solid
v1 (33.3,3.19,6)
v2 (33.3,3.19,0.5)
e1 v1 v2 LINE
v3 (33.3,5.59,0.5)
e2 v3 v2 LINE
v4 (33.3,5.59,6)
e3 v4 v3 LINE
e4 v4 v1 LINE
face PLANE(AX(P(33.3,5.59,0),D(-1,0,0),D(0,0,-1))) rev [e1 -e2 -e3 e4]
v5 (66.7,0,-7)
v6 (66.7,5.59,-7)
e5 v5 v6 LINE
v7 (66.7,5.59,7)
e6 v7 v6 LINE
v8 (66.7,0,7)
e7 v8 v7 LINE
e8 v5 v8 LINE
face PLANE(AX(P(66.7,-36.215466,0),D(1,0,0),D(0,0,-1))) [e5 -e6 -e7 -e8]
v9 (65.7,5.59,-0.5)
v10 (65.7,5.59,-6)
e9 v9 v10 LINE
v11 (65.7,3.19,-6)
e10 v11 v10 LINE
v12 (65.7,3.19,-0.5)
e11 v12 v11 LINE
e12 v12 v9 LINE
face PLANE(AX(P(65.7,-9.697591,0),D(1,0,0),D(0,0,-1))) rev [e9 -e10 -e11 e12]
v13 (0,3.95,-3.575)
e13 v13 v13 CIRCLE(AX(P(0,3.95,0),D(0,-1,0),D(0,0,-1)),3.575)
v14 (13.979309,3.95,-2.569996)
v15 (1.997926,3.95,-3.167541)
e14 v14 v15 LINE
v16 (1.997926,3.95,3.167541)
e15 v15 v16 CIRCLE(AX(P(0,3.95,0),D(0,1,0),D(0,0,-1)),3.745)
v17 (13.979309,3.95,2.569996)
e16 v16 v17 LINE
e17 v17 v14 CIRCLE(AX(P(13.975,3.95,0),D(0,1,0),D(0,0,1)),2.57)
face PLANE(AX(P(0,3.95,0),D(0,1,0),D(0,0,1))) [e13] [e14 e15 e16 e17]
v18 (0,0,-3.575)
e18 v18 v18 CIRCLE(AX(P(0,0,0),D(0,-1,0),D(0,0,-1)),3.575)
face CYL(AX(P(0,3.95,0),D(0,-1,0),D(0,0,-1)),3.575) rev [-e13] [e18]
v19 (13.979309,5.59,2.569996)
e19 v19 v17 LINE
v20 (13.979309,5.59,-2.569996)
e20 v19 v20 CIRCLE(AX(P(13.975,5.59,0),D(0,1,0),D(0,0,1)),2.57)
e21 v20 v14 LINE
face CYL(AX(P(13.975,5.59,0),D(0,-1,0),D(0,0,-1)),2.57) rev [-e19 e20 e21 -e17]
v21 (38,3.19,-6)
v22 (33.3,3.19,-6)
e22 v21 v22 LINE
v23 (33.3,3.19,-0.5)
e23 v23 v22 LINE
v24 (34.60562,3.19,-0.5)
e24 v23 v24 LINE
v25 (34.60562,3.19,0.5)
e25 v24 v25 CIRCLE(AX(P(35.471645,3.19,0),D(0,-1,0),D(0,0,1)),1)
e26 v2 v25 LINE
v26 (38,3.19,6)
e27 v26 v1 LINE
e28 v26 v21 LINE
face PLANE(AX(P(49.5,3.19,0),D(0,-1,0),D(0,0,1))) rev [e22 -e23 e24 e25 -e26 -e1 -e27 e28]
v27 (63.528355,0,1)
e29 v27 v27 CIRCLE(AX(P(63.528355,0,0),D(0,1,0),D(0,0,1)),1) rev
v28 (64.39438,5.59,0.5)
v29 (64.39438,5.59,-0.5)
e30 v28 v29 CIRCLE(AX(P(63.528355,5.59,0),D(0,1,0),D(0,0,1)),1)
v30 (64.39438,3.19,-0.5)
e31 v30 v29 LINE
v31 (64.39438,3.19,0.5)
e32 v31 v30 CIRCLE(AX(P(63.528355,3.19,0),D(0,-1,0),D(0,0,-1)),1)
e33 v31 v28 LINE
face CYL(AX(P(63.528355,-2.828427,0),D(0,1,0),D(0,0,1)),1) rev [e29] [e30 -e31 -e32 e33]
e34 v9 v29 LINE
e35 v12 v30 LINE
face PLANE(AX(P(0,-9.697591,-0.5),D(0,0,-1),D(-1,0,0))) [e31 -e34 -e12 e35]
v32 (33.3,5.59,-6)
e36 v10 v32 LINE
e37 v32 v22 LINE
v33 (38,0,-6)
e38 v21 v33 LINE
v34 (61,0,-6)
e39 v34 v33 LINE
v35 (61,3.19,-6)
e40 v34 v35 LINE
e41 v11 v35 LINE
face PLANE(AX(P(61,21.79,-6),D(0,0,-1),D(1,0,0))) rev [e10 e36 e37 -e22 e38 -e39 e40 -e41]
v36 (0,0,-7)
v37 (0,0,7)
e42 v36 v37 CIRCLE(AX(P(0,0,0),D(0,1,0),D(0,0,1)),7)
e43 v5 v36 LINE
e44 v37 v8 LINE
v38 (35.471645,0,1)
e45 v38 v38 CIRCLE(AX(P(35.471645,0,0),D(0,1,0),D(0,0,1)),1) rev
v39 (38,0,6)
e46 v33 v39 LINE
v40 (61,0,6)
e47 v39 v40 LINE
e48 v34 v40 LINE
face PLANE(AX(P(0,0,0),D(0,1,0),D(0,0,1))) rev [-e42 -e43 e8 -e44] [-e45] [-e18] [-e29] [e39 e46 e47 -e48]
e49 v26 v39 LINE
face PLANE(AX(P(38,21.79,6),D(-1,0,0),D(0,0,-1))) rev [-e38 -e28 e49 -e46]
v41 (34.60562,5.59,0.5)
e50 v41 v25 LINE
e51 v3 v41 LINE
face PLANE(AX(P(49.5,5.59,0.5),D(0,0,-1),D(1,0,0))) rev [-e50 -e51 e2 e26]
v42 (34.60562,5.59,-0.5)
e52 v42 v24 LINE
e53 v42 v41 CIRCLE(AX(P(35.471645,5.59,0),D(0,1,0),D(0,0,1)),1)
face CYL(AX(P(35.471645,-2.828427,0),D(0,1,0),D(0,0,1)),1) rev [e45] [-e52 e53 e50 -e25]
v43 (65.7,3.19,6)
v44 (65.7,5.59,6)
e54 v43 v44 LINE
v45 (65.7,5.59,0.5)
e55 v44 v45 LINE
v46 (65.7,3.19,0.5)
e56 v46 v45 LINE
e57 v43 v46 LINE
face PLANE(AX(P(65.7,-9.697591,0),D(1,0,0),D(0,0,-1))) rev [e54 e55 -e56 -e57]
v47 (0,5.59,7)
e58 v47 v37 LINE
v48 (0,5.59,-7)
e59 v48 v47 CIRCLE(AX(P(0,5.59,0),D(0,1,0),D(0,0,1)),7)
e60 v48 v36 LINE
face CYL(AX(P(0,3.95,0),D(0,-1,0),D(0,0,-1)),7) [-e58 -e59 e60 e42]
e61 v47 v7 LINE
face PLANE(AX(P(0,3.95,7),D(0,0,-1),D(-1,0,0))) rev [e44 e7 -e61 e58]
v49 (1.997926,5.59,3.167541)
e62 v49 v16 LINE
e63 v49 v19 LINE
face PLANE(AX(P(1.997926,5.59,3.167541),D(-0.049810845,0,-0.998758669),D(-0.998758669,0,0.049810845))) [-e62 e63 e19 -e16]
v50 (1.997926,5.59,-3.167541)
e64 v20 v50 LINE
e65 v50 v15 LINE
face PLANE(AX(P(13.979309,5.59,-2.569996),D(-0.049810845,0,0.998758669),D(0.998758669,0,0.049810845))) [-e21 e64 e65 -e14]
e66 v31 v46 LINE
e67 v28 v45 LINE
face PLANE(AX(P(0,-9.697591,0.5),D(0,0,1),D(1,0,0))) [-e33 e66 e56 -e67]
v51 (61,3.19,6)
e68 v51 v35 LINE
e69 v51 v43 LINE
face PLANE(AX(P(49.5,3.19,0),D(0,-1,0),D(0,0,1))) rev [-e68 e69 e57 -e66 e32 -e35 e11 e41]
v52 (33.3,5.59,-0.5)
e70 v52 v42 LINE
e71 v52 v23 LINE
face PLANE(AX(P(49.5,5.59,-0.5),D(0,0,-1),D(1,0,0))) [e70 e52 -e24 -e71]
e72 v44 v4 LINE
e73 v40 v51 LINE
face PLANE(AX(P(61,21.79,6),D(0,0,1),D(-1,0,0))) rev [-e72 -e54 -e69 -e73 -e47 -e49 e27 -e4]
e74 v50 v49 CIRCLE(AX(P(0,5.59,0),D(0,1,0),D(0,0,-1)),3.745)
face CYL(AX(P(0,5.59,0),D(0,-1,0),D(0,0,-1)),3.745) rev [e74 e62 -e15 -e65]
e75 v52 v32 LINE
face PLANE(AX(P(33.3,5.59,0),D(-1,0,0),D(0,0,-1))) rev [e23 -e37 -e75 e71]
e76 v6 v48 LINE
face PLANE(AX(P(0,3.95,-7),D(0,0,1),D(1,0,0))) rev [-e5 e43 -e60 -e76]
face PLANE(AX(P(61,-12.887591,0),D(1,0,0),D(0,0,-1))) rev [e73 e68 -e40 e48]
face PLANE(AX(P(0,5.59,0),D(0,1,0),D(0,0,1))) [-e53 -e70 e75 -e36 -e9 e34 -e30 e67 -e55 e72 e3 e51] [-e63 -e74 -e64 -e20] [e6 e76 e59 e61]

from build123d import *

# Parameters (mm, degrees)
BOSS_EXTRUDE1_DEPTH = 3.95
SKETCH2_R           = 3.575
CUT_EXTRUDE1_DEPTH  = 3.95
BOSS_EXTRUDE2_DEPTH = 1.64
SKETCH4_R           = 3.25
CUT_EXTRUDE2_DEPTH  = 63.643819328
CAVITY1_OUTLINE_R   = 3.25
CAVITY1_DEPTH       = 5.59
CAVITY1_START       = 3.19
CAVITY1_2_DEPTH     = 2.4
CUT_EXTRUDE4_DEPTH  = 63.643819328
BOSS_EXTRUDE3_START = -5.59
BOSS_EXTRUDE3_DEPTH = 5.59
BOSS_EXTRUDE4_DEPTH = 5.59
BOSS_EXTRUDE5_DEPTH = 5.59
CUT_EXTRUDE5_DEPTH  = 2.4
SKETCH7_R           = 1
CUT_EXTRUDE6_DEPTH  = 5.59


# Read off the part's stored shape, not the designer's step: Cavity1
with BuildPart() as part:
    # Sketch1 → Boss-Extrude1 (new body)
    with BuildSketch(Plane(origin=(0, 0, 0), x_dir=(1, 0, 0), z_dir=(0, 1, 0))):
        with BuildLine():
            Line((0, 7), (55, 7))
            ThreePointArc((55, 7), (62, 0), (55, -7))
            Line((55, -7), (0, -7))
            ThreePointArc((0, -7), (-7, 0), (0, 7))
        make_face()
    extrude(amount=BOSS_EXTRUDE1_DEPTH)

    # Sketch2 → Cut-Extrude1 (cut)
    with BuildSketch(Plane.XZ):
        with Locations(Location((0, 0, 0), (0, 0, 270))):
            Circle(SKETCH2_R)
    extrude(amount=-CUT_EXTRUDE1_DEPTH, mode=Mode.SUBTRACT)

    # Sketch3 → Boss-Extrude2 (add)
    with BuildSketch(Plane(origin=(0, 3.95, 0), x_dir=(1, 0, 0), z_dir=(0, 1, 0))):
        with BuildLine():
            Line((0, -7), (55, -7))
            ThreePointArc((55, -7), (62, 0), (55, 7))
            Line((55, 7), (0, 7))
            ThreePointArc((0, 7), (-7, 0), (0, -7))
        make_face()
        with BuildLine():
            Line((13.979308982, 2.569996388), (1.997926282, 3.167540934))
            ThreePointArc((1.997926282, 3.167540934), (-3.745, 0), (1.997926282, -3.167540934))
            Line((1.997926282, -3.167540934), (13.979308982, -2.569996388))
            ThreePointArc((13.979308982, -2.569996388), (16.545, 0), (13.979308982, 2.569996388))
        make_face(mode=Mode.SUBTRACT)
    extrude(amount=BOSS_EXTRUDE2_DEPTH)

    # Sketch4 → Cut-Extrude2 (cut, through all)
    with BuildSketch(Plane(origin=(0, 5.59, 0), x_dir=(1, 0, 0), z_dir=(0, 1, 0))):
        with Locations(Location((55, 0, 0), (0, 0, 270))):
            Circle(SKETCH4_R)
    extrude(amount=-CUT_EXTRUDE2_DEPTH, mode=Mode.SUBTRACT)

    # Cavity1 outline → Cavity1 (cut)
    with BuildSketch(Plane(origin=(0, 0, 0), x_dir=(1, 0, 0), z_dir=(0, 1, 0))):
        with BuildLine():
            Line((58.605551275, 6), (38, 6))
            Line((38, 6), (38, -6))
            Line((38, -6), (58.605551275, -6))
            ThreePointArc((58.605551275, -6), (59.949747468, -4.949747468), (61, -3.605551275))
            Line((61, -3.605551275), (61, 3.605551275))
            ThreePointArc((61, 3.605551275), (59.949747468, 4.949747468), (58.605551275, 6))
        make_face()
        with Locations((55, 0)):
            Circle(CAVITY1_OUTLINE_R, mode=Mode.SUBTRACT)
    extrude(amount=CAVITY1_DEPTH, mode=Mode.SUBTRACT)

    # Cavity1 2 outline → Cavity1 2 (cut)
    with BuildSketch(Plane(origin=(0, 0, 0), x_dir=(1, 0, 0), z_dir=(0, 1, 0)).offset(CAVITY1_START)):
        with BuildLine():
            Line((33.3, 0.5), (34.605619966, 0.5))
            ThreePointArc((34.605619966, 0.5), (36.47164537, 0), (34.605619966, -0.5))
            Line((34.605619966, -0.5), (33.3, -0.5))
            Line((33.3, -0.5), (33.3, -6))
            Line((33.3, -6), (38, -6))
            Line((38, -6), (38, 6))
            Line((38, 6), (33.3, 6))
            Line((33.3, 6), (33.3, 0.5))
        make_face()
        with BuildLine():
            ThreePointArc((61, -3.605551275), (62, 0), (61, 3.605551275))
            Line((61, 3.605551275), (61, -3.605551275))
        make_face()
    extrude(amount=CAVITY1_2_DEPTH, mode=Mode.SUBTRACT)

    # Sketch5 → Cut-Extrude4 (cut, through all)
    with BuildSketch(Plane.XZ):
        with BuildLine():
            Line((61, 3.605551275), (61, -3.605551275))
            ThreePointArc((61, -3.605551275), (62, 0), (61, 3.605551275))
        make_face()
    extrude(amount=-CUT_EXTRUDE4_DEPTH, mode=Mode.SUBTRACT)

    # Sketch6 → Boss-Extrude3 (add)
    with BuildSketch(Plane(origin=(0, 5.59, 0), x_dir=(1, 0, 0), z_dir=(0, 1, 0)).offset(BOSS_EXTRUDE3_START)):
        with BuildLine():
            Line((61, -6), (58.605551275, -6))
            ThreePointArc((58.605551275, -6), (56.870828693, -6.745368782), (55, -7))
            Line((55, -7), (66.7, -7))
            Line((66.7, -7), (66.7, 7))
            Line((66.7, 7), (55, 7))
            ThreePointArc((55, 7), (56.870828693, 6.745368782), (58.605551275, 6))
            Line((58.605551275, 6), (61, 6))
            Line((61, 6), (65.7, 6))
            Line((65.7, 6), (65.7, 0.5))
            Line((65.7, 0.5), (65.7, -0.5))
            Line((65.7, -0.5), (65.7, -6))
            Line((65.7, -6), (61, -6))
        make_face()
        with BuildLine():
            Line((58.605551275, -6), (33.3, -6))
            Line((33.3, -6), (33.3, -7))
            Line((33.3, -7), (55, -7))
            ThreePointArc((55, -7), (56.870828693, -6.745368782), (58.605551275, -6))
        make_face()
        with BuildLine():
            Line((33.3, 7), (33.3, 6))
            Line((33.3, 6), (58.605551275, 6))
            ThreePointArc((58.605551275, 6), (56.870828693, 6.745368782), (55, 7))
            Line((55, 7), (33.3, 7))
        make_face()
    extrude(amount=BOSS_EXTRUDE3_DEPTH)

    # Sketch6<3> → Boss-Extrude4 (add)
    with BuildSketch(Plane(origin=(0, 5.59, 0), x_dir=(1, 0, 0), z_dir=(0, 1, 0))):
        with BuildLine():
            Line((64.394380034, -0.5), (65.7, -0.5))
            Line((65.7, -0.5), (65.7, 0.5))
            Line((65.7, 0.5), (64.394380034, 0.5))
            ThreePointArc((64.394380034, 0.5), (62.52835463, 0), (64.394380034, -0.5))
        make_face()
    extrude(amount=-BOSS_EXTRUDE4_DEPTH)

    # Sketch6<5> → Boss-Extrude5 (add)
    with BuildSketch(Plane(origin=(0, 5.59, 0), x_dir=(1, 0, 0), z_dir=(0, 1, 0))):
        with BuildLine():
            Line((61, 6), (61, -6))
            Line((61, -6), (65.7, -6))
            Line((65.7, -6), (65.7, -0.5))
            Line((65.7, -0.5), (64.394380034, -0.5))
            ThreePointArc((64.394380034, -0.5), (62.52835463, 0), (64.394380034, 0.5))
            Line((64.394380034, 0.5), (65.7, 0.5))
            Line((65.7, 0.5), (65.7, 6))
            Line((65.7, 6), (61, 6))
        make_face()
    extrude(amount=-BOSS_EXTRUDE5_DEPTH)

    # Sketch6<6> → Cut-Extrude5 (cut)
    with BuildSketch(Plane(origin=(0, 5.59, 0), x_dir=(1, 0, 0), z_dir=(0, 1, 0))):
        with BuildLine():
            Line((61, 6), (61, -6))
            Line((61, -6), (65.7, -6))
            Line((65.7, -6), (65.7, -0.5))
            Line((65.7, -0.5), (64.394380034, -0.5))
            ThreePointArc((64.394380034, -0.5), (62.52835463, 0), (64.394380034, 0.5))
            Line((64.394380034, 0.5), (65.7, 0.5))
            Line((65.7, 0.5), (65.7, 6))
            Line((65.7, 6), (61, 6))
        make_face()
    extrude(amount=-CUT_EXTRUDE5_DEPTH, mode=Mode.SUBTRACT)

    # Sketch7 → Cut-Extrude6 (cut)
    with BuildSketch(Plane(origin=(0, 5.59, 0), x_dir=(1, 0, 0), z_dir=(0, 1, 0))):
        with Locations(Location((63.52835463, 0, 0), (0, 0, 270))):
            Circle(SKETCH7_R)
        with Locations(Location((35.47164537, 0, 0), (0, 0, 270))):
            Circle(SKETCH7_R)
    extrude(amount=-CUT_EXTRUDE6_DEPTH, mode=Mode.SUBTRACT)


solid = part.part
